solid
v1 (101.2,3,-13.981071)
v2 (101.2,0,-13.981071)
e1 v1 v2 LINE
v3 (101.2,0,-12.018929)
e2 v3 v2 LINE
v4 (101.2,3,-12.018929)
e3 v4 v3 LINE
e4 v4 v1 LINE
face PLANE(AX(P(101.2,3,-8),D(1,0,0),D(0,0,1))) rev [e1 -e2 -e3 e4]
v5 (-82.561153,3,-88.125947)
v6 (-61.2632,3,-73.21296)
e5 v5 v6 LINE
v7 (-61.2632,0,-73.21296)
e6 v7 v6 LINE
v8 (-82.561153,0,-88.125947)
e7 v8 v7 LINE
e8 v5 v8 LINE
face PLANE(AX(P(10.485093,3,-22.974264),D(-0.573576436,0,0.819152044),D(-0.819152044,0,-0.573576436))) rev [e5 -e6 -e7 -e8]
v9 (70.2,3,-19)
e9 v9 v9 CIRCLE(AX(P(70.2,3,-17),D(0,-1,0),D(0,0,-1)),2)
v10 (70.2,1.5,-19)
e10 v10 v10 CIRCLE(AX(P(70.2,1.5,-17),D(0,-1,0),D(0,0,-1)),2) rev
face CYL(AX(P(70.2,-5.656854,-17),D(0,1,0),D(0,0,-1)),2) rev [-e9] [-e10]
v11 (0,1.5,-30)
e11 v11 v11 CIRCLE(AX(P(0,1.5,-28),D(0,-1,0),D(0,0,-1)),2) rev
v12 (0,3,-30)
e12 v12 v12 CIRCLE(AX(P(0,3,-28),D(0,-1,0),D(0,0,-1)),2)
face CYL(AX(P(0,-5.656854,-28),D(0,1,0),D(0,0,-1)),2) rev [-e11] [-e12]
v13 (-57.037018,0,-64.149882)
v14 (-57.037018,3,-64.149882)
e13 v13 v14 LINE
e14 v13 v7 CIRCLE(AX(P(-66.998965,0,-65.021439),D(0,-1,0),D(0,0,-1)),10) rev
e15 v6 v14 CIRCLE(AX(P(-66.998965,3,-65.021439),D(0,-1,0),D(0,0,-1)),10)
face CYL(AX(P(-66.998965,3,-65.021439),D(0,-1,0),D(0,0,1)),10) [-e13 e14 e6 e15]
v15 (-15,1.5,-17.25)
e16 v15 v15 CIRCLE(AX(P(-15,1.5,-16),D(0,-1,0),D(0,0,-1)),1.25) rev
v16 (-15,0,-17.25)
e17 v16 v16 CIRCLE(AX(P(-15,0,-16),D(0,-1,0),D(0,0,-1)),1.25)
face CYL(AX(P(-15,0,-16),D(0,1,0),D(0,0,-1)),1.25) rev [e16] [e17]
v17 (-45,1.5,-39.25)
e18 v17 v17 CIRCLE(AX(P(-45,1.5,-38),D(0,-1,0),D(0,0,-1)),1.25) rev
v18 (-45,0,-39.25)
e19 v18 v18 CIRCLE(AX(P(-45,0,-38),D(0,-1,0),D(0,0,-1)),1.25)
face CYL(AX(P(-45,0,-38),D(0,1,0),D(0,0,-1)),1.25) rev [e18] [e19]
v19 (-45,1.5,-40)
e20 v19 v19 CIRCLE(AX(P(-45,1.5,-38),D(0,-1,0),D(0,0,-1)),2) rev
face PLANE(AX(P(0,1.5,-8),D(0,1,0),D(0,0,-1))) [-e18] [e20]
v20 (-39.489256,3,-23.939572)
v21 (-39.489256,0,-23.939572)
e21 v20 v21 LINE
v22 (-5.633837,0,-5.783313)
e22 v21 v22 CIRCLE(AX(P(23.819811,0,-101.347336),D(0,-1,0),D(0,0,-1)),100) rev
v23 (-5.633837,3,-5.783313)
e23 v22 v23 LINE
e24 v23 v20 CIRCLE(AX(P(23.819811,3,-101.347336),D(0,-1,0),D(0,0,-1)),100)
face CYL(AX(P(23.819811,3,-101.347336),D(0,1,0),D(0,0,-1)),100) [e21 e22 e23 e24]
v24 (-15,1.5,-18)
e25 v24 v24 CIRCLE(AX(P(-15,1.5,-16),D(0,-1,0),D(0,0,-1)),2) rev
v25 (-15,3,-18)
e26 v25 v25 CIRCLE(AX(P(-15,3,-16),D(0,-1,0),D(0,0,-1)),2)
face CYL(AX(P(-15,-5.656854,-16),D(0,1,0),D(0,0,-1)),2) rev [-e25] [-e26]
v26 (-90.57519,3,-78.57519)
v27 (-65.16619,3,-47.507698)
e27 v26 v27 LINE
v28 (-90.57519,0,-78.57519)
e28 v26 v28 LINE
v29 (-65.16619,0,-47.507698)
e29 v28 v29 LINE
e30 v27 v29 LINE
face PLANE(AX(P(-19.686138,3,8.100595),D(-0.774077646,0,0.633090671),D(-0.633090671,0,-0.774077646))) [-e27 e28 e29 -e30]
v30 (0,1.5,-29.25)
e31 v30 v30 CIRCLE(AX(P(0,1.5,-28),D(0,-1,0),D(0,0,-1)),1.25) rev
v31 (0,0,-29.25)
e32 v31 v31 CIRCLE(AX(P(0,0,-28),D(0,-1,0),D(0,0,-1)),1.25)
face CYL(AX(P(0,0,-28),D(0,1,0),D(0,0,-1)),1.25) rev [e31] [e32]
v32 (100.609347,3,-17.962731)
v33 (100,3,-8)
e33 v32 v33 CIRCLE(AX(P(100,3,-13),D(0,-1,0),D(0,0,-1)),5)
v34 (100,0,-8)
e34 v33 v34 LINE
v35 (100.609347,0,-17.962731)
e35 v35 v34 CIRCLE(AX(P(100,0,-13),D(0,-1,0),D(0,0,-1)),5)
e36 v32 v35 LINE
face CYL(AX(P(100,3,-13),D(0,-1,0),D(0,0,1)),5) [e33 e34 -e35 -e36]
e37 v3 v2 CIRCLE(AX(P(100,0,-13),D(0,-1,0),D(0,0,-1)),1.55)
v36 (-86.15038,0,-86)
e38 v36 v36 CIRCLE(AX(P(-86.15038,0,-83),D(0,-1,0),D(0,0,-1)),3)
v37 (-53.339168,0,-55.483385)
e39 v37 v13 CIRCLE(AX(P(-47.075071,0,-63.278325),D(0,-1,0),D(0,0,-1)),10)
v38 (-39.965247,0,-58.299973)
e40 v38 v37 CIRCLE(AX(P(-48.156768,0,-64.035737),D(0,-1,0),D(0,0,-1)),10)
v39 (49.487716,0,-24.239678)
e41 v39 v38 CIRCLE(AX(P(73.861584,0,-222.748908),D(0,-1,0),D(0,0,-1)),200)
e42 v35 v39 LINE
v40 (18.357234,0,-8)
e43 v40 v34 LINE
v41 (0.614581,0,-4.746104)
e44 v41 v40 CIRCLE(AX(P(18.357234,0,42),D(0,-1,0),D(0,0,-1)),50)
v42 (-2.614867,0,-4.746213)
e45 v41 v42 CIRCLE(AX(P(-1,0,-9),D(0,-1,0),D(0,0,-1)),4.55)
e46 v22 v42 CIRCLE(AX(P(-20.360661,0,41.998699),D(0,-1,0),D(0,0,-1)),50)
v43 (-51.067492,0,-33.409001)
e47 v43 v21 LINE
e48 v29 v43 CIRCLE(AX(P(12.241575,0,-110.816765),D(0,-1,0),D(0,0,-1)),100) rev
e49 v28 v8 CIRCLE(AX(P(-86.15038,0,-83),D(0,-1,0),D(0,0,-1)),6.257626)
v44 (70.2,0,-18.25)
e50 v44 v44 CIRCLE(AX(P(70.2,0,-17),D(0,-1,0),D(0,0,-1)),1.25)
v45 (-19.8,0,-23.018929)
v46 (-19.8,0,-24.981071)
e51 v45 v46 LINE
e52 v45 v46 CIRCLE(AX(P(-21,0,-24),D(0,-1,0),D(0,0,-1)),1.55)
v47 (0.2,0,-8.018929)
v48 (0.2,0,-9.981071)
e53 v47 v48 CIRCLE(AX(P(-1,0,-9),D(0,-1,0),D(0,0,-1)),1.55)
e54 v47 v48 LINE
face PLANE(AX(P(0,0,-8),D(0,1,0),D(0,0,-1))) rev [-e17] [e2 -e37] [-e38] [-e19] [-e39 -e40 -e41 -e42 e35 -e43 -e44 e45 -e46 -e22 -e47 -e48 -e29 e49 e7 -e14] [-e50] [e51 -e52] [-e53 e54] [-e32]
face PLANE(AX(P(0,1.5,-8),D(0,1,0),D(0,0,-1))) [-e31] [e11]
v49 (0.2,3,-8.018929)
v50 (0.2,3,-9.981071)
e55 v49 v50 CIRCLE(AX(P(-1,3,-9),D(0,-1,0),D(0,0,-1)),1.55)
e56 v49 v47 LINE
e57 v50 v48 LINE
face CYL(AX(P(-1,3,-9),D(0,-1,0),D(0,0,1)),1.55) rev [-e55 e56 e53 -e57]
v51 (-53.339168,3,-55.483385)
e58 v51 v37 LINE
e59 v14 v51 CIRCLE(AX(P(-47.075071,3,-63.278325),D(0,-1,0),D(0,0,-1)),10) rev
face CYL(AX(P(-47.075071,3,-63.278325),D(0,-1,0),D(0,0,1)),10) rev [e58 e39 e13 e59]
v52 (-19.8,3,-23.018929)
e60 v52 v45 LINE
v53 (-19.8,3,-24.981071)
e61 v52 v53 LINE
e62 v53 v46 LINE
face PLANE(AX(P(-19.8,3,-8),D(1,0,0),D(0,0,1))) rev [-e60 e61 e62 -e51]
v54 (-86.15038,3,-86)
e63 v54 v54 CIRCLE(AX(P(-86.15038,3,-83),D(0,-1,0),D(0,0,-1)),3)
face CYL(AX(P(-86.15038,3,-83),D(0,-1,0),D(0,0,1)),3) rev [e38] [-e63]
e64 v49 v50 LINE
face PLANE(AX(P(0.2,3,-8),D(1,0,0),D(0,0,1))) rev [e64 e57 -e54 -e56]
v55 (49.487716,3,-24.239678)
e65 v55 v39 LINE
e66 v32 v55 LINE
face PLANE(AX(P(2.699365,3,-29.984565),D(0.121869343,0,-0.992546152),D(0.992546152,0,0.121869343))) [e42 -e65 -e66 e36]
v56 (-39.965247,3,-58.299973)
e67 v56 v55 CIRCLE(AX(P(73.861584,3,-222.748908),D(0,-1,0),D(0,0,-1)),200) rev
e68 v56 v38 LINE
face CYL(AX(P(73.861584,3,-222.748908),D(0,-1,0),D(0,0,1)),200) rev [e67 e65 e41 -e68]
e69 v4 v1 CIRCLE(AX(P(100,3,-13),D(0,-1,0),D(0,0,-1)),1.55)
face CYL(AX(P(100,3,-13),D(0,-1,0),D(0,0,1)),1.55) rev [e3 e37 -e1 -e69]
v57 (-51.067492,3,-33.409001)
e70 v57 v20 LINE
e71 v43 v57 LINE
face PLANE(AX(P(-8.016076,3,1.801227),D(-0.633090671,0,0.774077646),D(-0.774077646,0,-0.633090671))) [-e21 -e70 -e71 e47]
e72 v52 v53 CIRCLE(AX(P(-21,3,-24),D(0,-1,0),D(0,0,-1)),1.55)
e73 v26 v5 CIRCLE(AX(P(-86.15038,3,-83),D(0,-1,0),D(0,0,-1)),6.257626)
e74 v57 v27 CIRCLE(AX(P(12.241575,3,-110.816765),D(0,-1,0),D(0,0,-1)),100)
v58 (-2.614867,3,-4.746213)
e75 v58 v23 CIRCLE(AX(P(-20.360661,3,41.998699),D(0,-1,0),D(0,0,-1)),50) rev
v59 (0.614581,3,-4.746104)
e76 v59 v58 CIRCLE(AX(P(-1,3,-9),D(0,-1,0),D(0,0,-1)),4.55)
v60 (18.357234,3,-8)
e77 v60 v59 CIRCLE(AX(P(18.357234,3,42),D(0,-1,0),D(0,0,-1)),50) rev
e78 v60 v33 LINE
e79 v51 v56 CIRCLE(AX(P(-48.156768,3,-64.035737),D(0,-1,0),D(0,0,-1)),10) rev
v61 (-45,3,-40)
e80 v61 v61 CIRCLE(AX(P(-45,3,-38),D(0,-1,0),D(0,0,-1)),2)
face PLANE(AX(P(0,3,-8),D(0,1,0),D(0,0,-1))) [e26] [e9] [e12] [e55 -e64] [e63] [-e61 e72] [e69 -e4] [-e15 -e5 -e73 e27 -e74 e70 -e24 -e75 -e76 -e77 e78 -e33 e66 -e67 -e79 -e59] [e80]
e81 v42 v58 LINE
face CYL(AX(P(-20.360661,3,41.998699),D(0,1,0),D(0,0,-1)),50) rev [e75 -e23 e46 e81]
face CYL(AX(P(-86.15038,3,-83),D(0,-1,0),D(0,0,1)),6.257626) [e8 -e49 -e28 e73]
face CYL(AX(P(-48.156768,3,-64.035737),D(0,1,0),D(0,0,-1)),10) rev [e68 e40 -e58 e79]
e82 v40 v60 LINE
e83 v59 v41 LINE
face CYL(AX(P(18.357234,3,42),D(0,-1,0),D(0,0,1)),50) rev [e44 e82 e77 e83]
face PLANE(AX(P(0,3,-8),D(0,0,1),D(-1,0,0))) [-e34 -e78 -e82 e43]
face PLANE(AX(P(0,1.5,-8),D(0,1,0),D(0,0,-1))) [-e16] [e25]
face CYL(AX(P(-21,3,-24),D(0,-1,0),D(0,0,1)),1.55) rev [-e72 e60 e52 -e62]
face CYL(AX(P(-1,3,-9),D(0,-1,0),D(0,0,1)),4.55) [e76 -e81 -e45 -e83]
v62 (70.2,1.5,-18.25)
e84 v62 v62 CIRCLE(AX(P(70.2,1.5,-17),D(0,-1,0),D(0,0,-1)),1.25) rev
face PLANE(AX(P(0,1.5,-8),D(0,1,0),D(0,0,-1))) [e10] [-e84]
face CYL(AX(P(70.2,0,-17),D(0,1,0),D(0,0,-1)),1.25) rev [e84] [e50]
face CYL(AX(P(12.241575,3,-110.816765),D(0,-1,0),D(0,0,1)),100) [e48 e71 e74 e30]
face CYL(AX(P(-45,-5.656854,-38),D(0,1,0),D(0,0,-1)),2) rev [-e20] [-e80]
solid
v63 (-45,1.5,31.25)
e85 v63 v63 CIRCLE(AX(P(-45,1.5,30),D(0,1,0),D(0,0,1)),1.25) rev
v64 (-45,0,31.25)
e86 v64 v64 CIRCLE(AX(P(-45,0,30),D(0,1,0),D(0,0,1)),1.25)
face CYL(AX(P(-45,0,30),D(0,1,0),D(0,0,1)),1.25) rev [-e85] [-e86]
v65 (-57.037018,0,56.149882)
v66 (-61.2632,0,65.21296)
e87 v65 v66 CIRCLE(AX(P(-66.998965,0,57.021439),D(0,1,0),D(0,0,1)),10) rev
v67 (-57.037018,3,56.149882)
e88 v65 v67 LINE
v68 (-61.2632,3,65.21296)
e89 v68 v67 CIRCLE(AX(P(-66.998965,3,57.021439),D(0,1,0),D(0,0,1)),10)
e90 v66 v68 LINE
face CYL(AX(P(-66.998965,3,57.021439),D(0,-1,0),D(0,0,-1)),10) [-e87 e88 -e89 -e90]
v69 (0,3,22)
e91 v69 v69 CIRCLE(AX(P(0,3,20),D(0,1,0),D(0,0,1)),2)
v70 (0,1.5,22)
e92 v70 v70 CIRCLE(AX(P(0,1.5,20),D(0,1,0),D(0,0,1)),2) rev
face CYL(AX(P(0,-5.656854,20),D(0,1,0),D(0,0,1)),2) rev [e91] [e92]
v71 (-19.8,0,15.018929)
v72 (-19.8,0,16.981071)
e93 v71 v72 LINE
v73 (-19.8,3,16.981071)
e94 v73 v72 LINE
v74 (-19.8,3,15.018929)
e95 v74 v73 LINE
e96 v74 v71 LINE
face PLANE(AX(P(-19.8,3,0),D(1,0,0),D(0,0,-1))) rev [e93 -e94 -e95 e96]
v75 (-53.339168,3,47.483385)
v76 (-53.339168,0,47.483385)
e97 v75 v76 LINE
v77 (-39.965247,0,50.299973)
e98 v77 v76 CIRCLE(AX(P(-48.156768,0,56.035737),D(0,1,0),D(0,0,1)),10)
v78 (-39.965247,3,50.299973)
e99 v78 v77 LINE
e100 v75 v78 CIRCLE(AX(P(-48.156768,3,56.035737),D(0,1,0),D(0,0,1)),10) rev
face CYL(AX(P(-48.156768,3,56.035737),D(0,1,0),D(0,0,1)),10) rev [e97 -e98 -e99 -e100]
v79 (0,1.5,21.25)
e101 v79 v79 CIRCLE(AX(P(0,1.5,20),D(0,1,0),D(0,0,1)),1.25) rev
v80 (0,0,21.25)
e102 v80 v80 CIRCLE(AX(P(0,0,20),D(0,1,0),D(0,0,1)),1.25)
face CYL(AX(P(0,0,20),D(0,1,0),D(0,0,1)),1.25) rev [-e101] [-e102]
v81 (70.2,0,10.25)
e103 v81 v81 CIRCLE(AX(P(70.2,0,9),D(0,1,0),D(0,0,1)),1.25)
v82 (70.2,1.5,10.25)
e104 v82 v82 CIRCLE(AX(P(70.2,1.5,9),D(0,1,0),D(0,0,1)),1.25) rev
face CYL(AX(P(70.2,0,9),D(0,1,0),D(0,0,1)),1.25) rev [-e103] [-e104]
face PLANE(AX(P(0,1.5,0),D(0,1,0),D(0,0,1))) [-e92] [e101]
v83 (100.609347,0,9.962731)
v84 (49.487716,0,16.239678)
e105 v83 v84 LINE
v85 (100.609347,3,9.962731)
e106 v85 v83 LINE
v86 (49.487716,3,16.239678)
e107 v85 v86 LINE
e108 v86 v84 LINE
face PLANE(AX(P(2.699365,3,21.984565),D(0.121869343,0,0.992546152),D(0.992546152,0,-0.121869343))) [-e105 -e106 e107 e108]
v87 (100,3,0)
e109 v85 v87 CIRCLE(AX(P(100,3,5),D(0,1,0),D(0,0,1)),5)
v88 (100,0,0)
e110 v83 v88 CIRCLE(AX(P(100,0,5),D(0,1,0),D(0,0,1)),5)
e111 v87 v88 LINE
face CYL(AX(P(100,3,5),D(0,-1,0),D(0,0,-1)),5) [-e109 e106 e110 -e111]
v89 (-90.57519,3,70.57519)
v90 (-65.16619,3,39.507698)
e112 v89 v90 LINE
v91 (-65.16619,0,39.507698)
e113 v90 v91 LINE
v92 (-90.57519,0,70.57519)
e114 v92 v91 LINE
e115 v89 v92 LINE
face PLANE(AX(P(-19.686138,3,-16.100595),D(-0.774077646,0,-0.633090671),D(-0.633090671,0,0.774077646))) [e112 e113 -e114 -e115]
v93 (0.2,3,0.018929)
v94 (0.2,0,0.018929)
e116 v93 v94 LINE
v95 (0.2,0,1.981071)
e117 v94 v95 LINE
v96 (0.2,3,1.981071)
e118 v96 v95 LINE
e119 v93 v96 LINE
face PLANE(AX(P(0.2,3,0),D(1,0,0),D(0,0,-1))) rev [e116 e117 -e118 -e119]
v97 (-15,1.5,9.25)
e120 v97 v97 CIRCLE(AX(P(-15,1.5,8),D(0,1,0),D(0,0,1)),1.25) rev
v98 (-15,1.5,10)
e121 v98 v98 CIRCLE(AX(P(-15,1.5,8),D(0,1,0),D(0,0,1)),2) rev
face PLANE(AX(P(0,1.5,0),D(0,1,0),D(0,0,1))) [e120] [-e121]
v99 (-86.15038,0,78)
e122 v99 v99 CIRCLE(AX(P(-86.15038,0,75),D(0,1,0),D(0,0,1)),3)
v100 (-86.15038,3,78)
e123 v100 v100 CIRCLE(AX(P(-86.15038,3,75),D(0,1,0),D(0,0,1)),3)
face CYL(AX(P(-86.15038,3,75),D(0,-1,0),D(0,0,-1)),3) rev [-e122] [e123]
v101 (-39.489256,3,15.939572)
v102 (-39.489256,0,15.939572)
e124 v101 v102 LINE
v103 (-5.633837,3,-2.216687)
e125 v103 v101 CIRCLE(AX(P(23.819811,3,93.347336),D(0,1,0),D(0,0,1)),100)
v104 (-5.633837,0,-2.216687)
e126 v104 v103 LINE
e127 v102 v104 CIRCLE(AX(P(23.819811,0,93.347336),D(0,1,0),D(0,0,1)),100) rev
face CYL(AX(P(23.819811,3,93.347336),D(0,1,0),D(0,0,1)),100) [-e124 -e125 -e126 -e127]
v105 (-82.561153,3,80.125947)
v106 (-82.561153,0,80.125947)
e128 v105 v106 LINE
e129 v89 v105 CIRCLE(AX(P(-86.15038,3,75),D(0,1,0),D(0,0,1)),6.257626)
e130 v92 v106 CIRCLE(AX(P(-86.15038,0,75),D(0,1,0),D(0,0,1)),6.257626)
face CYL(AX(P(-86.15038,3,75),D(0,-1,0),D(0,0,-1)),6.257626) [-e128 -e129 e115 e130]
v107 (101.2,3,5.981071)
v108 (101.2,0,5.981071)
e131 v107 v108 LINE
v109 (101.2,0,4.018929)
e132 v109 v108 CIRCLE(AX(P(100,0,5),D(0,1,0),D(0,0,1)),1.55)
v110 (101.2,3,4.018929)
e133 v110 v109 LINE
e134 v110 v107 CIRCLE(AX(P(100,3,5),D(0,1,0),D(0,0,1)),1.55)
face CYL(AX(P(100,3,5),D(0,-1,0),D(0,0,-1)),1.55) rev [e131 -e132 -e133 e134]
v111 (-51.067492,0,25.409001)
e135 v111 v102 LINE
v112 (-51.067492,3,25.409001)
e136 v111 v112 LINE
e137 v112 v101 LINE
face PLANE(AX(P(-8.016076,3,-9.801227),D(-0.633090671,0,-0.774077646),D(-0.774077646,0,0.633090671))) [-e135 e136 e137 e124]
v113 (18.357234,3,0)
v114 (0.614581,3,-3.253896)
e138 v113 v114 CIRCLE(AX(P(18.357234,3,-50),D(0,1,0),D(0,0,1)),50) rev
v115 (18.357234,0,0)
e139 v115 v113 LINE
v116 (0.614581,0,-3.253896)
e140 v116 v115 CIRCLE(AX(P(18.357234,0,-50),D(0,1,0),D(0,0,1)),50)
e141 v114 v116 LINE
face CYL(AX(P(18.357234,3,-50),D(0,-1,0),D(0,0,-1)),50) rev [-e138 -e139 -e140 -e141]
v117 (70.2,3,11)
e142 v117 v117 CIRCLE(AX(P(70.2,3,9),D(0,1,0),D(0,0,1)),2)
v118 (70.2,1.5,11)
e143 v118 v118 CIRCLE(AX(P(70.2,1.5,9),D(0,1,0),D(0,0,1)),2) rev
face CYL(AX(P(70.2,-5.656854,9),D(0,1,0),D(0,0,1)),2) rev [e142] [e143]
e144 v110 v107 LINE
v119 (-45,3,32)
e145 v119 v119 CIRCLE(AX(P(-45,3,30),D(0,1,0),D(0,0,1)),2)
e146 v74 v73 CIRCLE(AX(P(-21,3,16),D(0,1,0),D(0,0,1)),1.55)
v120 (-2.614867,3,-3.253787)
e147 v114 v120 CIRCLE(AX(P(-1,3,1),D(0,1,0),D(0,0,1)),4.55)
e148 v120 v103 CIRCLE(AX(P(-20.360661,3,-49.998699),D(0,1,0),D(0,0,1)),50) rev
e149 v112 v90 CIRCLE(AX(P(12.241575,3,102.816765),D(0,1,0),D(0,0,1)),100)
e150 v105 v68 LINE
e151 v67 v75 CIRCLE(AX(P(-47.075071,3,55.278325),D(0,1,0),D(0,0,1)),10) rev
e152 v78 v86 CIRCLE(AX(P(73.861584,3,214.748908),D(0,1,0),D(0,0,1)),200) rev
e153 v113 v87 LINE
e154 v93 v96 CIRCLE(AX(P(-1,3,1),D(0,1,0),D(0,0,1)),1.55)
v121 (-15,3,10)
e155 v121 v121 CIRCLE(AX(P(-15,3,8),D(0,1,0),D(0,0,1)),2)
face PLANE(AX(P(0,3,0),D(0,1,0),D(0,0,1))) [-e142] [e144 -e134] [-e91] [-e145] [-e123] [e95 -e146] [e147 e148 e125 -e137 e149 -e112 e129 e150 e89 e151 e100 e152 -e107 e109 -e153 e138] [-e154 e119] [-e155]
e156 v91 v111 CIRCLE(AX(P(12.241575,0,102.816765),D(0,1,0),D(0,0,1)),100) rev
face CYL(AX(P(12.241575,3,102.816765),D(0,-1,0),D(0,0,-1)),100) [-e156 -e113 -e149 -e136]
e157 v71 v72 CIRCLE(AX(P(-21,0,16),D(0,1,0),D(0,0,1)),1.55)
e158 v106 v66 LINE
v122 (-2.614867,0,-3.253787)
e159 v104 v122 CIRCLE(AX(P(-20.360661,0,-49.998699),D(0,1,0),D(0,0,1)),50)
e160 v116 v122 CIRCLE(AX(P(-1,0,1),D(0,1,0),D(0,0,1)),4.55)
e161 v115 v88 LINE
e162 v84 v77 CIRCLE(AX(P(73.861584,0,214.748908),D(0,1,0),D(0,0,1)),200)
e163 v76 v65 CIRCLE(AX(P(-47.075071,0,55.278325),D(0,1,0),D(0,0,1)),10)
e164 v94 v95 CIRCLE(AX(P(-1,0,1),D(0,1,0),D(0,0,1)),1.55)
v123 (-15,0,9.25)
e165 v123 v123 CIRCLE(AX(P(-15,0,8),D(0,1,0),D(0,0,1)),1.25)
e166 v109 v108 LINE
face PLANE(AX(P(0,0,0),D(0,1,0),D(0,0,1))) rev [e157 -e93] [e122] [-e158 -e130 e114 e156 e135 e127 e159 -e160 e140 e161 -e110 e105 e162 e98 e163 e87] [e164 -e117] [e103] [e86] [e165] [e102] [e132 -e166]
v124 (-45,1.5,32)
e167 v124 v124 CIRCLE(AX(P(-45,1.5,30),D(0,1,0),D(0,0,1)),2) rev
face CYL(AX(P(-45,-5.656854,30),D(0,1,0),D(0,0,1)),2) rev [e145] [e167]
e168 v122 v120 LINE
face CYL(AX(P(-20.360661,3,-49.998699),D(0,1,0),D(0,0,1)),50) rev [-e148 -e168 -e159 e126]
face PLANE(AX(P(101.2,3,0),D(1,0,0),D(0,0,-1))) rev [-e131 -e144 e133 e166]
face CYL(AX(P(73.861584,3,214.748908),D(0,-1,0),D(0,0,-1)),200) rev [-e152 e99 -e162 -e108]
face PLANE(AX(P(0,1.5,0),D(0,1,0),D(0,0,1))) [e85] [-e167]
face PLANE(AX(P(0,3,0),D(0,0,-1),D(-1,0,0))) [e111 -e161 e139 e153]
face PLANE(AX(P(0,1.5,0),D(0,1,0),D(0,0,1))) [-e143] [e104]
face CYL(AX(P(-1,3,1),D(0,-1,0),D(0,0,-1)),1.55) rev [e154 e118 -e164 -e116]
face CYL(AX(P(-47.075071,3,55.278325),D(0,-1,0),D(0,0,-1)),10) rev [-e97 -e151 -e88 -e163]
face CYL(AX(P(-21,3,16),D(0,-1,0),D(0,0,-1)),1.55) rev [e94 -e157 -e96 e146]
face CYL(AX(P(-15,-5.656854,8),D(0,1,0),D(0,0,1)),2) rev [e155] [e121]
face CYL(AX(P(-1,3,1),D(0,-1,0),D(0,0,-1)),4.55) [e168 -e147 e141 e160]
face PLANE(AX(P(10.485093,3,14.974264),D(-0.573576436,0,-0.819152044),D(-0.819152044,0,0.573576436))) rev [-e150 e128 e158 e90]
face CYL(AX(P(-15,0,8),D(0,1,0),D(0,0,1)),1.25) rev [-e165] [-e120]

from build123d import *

# Parameters (mm, degrees)
SKETCH_3_R          = 3
EXTRUDE_1_DEPTH     = 3
FILLET_1_R          = 200
FILLET_3_R          = 50
SKETCH_4_R          = 1.25
CUT_EXTRUDE_1_DEPTH = 133.803621182
SKETCH_4_3_R        = 2
SKETCH_4_3_R_2      = 1.25
CUT_EXTRUDE_2_DEPTH = 1.5
FILLET_4_R          = 10
FILLET_5_R          = 10
FILLET_6_R          = 100


# Some blends are built 0.0001 mm under size
with BuildPart() as part:
    # 草图3 → 凸台-拉伸1 (new body)
    with BuildSketch(Plane(origin=(0, 0, 0), x_dir=(1, 0, 0), z_dir=(0, 1, 0))):
        with BuildLine():
            ThreePointArc((3.438749824, 0), (-1, 3.55), (-5.438749824, 0))
            Line((-5.438749824, 0), (-20, 0))
            Line((-20, 0), (-58.823128982, -31.75206117))
            Line((-58.823128982, -31.75206117), (-90.575190152, -70.575190152))
            ThreePointArc((-90.575190152, -70.575190152), (-90.944000004, -79.022324522), (-82.561153427, -80.12594721))
            Line((-82.561153427, -80.12594721), (-53.071679833, -59.477195502))
            Line((-53.071679833, -59.477195502), (-58.807444196, -51.285675059))
            Line((-58.807444196, -51.285675059), (-45.701011487, -42.108452077))
            Line((-45.701011487, -42.108452077), (-39.965247124, -50.29997252))
            Line((-39.965247124, -50.29997252), (0, -22.316005218))
            Line((0, -22.316005218), (100.609346717, -9.962730758))
            ThreePointArc((100.609346717, -9.962730758), (104.990673992, -4.694757302), (100, 0))
            Line((100, 0), (3.438749824, 0))
        make_face()
        with BuildLine():
            Line((0.2, -0.018929156), (0.2, -1.981070844))
            ThreePointArc((0.2, -1.981070844), (-2.55, -1), (0.2, -0.018929156))
        make_face(mode=Mode.SUBTRACT)
        with BuildLine():
            ThreePointArc((-19.8, -16.981070844), (-22.55, -16), (-19.8, -15.018929156))
            Line((-19.8, -15.018929156), (-19.8, -16.981070844))
        make_face(mode=Mode.SUBTRACT)
        with BuildLine():
            ThreePointArc((101.2, -5.981070844), (98.45, -5), (101.2, -4.018929156))
            Line((101.2, -4.018929156), (101.2, -5.981070844))
        make_face(mode=Mode.SUBTRACT)
        with Locations(Location((-86.150380304, -75, 0), (0, 0, 270))):
            Circle(SKETCH_3_R, mode=Mode.SUBTRACT)
    extrude(amount=EXTRUDE_1_DEPTH)

    # 圆角1
    # the kernel refuses this fillet: 200 mm, written as the material it adds along each edge
    with BuildSketch(Plane(origin=(0, 0, 22.316005218), x_dir=(-0.8191520442889868, 0, 0.5735764363510532), z_dir=(0, 1, 0))) as fillet_1_piece_1:
        with BuildLine():
            CenterArc((49.871110762, 199.997070178), FILLET_1_R, 242, 27.689869999)
            Line((-44.023201795, 23.407551606), (-45.901088046, 19.875761235))
            Line((-45.901088046, 19.875761235), (-1.877886251, -3.531790371))
            Line((-1.877886251, -3.531790371), (0, -4))
            ThreePointArc((0, -4), (24.394279061, -4), (48.76690707, -3.999941404))
            Line((48.76690707, -3.999941404), (48.788558122, 0))
        make_face()
    extrude(amount=3)

    # 圆角3
    # the kernel refuses this fillet: 50 mm, written as the material it adds along each edge
    with BuildSketch(Plane(origin=(3.438749824, 0, 0), x_dir=(-0.6554771924780477, 0, -0.7552149694895463), z_dir=(0, 1, 0))) as fillet_3_piece_1:
        with BuildLine():
            CenterArc((27.982022488, -44.040522037), FILLET_3_R, 118.259718548, 20.784438328)
            Line((-9.778725986, -11.266662413), (-10.533940956, -10.611185221))
            Line((-10.533940956, -10.611185221), (-0.755214969, 0.655477192))
            Line((-0.755214969, 0.655477192), (0.473469078, 0.880810441))
            ThreePointArc((0.473469078, 0.880810441), (2.154284303, 0.457687505), (3.835099529, 0.880810441))
            Line((3.835099529, 0.880810441), (4.308568607, 0))
        make_face()
    extrude(amount=3)
    with BuildSketch(Plane(origin=(-5.438749824, 0, 0), x_dir=(-1, 0, 0), z_dir=(0, 1, 0))) as fillet_3_piece_2:
        with BuildLine():
            CenterArc((14.921910743, -49.998699223), FILLET_3_R, 90.413290151, 20.374998027)
            Line((-2.823882627, -3.253787011), (-3.178798495, -2.318888767))
            ThreePointArc((-3.178798495, -2.318888767), (-1.757658507, -1.32685396), (-0.975549412, 0.21978022))
            Line((-0.975549412, 0.21978022), (0, 1))
            ThreePointArc((0, 1), (7.280625088, 1), (14.554036965, 0.999973984))
            Line((14.554036965, 0.999973984), (14.561250176, 0))
        make_face()
    extrude(amount=3)

    # 草图4 → 切除-拉伸1 (cut, through all)
    with BuildSketch(Plane(origin=(0, 3, 0), x_dir=(1, 0, 0), z_dir=(0, 1, 0))):
        with Locations(Location((70.2, -9, 0), (0, 0, 270))):
            Circle(SKETCH_4_R)
        with Locations(Location((0, -20, 0), (0, 0, 270))):
            Circle(SKETCH_4_R)
        with Locations(Location((-45, -30, 0), (0, 0, 270))):
            Circle(SKETCH_4_R)
        with Locations(Location((-15, -8, 0), (0, 0, 270))):
            Circle(SKETCH_4_R)
    extrude(amount=-CUT_EXTRUDE_1_DEPTH, mode=Mode.SUBTRACT)

    # 草图4<3> → 切除-拉伸2 (cut)
    # profile 1 of 4: a face of its own
    with BuildSketch(Plane(origin=(0, 3, 0), x_dir=(1, 0, 0), z_dir=(0, 1, 0))):
        with Locations(Location((70.2, -9, 0), (0, 0, 270))):
            Circle(SKETCH_4_3_R)
        with Locations(Location((70.2, -9, 0), (0, 0, 270))):
            Circle(SKETCH_4_3_R_2, mode=Mode.SUBTRACT)
    # profile 2 of 4: a face of its own
    with BuildSketch(Plane(origin=(0, 3, 0), x_dir=(1, 0, 0), z_dir=(0, 1, 0))):
        with Locations(Location((0, -20, 0), (0, 0, 270))):
            Circle(SKETCH_4_3_R)
        with Locations(Location((0, -20, 0), (0, 0, 270))):
            Circle(SKETCH_4_3_R_2, mode=Mode.SUBTRACT)
    # profile 3 of 4: a face of its own
    with BuildSketch(Plane(origin=(0, 3, 0), x_dir=(1, 0, 0), z_dir=(0, 1, 0))):
        with Locations(Location((-45, -30, 0), (0, 0, 270))):
            Circle(SKETCH_4_3_R)
        with Locations(Location((-45, -30, 0), (0, 0, 270))):
            Circle(SKETCH_4_3_R_2, mode=Mode.SUBTRACT)
    # profile 4 of 4: a face of its own
    with BuildSketch(Plane(origin=(0, 3, 0), x_dir=(1, 0, 0), z_dir=(0, 1, 0))):
        with Locations(Location((-15, -8, 0), (0, 0, 270))):
            Circle(SKETCH_4_3_R)
        with Locations(Location((-15, -8, 0), (0, 0, 270))):
            Circle(SKETCH_4_3_R_2, mode=Mode.SUBTRACT)
    extrude(amount=-CUT_EXTRUDE_2_DEPTH, mode=Mode.SUBTRACT)

    # 圆角4
    fillet_4_edges = [part.edges().sort_by_distance(p)[0] for p in [
        (-53.071679833, 1.5, 59.477195502),
    ]]
    fillet(fillet_4_edges, radius=FILLET_4_R - 0.0001)  # a hair under: the kernel refuses the full size

    # 圆角5
    # the kernel refuses this fillet: 10 mm, written as the material it adds along each edge
    with BuildSketch(Plane(origin=(-45.701011487, 0, 42.108452077), x_dir=(-0.8191520442889864, 0, 0.5735764363510539), z_dir=(0, 1, 0))) as fillet_5_piece_1:
        with BuildLine():
            CenterArc((FILLET_5_R, FILLET_5_R), FILLET_5_R, 180, 90)
            Line((0, FILLET_5_R), (0, 0))
            Line((0, 0), (FILLET_5_R, 0))
        make_face()
    extrude(amount=3)
    with BuildSketch(Plane(origin=(-58.807444196, 0, 51.285675059), x_dir=(0.3420261980761126, 0, 0.9396904170148804), z_dir=(0, 1, 0))) as fillet_5_piece_2:
        with BuildLine():
            CenterArc((7.764622652, 9.659249058), FILLET_5_R, 194.999630824, 60.000165399)
            Line((-1.894652287, 7.071120845), (-2.860579781, 6.812308023))
            Line((-2.860579781, 6.812308023), (-0.965927494, -0.258812821))
            Line((-0.965927494, -0.258812821), (0.258812821, -0.965927494))
            ThreePointArc((0.258812821, -0.965927494), (0.258909414, -0.965901613), (4.917575367, -0.965924906))
            Line((4.917575367, -0.965924906), (5.176397847, 0))
        make_face()
    extrude(amount=3)

    # 圆角6
    fillet_6_edges = [part.edges().sort_by_distance(p)[0] for p in [
        (-58.823128982, 1.5, 31.75206117),
        (-20, 1.5, 0),
    ]]
    fillet(fillet_6_edges, radius=FILLET_6_R)


with BuildPart() as body_2:
    # 镜向2: mirrored copy
    add(part.part.mirror(Plane.XY.offset(-4)))


solid = Compound([part.part, body_2.part])
